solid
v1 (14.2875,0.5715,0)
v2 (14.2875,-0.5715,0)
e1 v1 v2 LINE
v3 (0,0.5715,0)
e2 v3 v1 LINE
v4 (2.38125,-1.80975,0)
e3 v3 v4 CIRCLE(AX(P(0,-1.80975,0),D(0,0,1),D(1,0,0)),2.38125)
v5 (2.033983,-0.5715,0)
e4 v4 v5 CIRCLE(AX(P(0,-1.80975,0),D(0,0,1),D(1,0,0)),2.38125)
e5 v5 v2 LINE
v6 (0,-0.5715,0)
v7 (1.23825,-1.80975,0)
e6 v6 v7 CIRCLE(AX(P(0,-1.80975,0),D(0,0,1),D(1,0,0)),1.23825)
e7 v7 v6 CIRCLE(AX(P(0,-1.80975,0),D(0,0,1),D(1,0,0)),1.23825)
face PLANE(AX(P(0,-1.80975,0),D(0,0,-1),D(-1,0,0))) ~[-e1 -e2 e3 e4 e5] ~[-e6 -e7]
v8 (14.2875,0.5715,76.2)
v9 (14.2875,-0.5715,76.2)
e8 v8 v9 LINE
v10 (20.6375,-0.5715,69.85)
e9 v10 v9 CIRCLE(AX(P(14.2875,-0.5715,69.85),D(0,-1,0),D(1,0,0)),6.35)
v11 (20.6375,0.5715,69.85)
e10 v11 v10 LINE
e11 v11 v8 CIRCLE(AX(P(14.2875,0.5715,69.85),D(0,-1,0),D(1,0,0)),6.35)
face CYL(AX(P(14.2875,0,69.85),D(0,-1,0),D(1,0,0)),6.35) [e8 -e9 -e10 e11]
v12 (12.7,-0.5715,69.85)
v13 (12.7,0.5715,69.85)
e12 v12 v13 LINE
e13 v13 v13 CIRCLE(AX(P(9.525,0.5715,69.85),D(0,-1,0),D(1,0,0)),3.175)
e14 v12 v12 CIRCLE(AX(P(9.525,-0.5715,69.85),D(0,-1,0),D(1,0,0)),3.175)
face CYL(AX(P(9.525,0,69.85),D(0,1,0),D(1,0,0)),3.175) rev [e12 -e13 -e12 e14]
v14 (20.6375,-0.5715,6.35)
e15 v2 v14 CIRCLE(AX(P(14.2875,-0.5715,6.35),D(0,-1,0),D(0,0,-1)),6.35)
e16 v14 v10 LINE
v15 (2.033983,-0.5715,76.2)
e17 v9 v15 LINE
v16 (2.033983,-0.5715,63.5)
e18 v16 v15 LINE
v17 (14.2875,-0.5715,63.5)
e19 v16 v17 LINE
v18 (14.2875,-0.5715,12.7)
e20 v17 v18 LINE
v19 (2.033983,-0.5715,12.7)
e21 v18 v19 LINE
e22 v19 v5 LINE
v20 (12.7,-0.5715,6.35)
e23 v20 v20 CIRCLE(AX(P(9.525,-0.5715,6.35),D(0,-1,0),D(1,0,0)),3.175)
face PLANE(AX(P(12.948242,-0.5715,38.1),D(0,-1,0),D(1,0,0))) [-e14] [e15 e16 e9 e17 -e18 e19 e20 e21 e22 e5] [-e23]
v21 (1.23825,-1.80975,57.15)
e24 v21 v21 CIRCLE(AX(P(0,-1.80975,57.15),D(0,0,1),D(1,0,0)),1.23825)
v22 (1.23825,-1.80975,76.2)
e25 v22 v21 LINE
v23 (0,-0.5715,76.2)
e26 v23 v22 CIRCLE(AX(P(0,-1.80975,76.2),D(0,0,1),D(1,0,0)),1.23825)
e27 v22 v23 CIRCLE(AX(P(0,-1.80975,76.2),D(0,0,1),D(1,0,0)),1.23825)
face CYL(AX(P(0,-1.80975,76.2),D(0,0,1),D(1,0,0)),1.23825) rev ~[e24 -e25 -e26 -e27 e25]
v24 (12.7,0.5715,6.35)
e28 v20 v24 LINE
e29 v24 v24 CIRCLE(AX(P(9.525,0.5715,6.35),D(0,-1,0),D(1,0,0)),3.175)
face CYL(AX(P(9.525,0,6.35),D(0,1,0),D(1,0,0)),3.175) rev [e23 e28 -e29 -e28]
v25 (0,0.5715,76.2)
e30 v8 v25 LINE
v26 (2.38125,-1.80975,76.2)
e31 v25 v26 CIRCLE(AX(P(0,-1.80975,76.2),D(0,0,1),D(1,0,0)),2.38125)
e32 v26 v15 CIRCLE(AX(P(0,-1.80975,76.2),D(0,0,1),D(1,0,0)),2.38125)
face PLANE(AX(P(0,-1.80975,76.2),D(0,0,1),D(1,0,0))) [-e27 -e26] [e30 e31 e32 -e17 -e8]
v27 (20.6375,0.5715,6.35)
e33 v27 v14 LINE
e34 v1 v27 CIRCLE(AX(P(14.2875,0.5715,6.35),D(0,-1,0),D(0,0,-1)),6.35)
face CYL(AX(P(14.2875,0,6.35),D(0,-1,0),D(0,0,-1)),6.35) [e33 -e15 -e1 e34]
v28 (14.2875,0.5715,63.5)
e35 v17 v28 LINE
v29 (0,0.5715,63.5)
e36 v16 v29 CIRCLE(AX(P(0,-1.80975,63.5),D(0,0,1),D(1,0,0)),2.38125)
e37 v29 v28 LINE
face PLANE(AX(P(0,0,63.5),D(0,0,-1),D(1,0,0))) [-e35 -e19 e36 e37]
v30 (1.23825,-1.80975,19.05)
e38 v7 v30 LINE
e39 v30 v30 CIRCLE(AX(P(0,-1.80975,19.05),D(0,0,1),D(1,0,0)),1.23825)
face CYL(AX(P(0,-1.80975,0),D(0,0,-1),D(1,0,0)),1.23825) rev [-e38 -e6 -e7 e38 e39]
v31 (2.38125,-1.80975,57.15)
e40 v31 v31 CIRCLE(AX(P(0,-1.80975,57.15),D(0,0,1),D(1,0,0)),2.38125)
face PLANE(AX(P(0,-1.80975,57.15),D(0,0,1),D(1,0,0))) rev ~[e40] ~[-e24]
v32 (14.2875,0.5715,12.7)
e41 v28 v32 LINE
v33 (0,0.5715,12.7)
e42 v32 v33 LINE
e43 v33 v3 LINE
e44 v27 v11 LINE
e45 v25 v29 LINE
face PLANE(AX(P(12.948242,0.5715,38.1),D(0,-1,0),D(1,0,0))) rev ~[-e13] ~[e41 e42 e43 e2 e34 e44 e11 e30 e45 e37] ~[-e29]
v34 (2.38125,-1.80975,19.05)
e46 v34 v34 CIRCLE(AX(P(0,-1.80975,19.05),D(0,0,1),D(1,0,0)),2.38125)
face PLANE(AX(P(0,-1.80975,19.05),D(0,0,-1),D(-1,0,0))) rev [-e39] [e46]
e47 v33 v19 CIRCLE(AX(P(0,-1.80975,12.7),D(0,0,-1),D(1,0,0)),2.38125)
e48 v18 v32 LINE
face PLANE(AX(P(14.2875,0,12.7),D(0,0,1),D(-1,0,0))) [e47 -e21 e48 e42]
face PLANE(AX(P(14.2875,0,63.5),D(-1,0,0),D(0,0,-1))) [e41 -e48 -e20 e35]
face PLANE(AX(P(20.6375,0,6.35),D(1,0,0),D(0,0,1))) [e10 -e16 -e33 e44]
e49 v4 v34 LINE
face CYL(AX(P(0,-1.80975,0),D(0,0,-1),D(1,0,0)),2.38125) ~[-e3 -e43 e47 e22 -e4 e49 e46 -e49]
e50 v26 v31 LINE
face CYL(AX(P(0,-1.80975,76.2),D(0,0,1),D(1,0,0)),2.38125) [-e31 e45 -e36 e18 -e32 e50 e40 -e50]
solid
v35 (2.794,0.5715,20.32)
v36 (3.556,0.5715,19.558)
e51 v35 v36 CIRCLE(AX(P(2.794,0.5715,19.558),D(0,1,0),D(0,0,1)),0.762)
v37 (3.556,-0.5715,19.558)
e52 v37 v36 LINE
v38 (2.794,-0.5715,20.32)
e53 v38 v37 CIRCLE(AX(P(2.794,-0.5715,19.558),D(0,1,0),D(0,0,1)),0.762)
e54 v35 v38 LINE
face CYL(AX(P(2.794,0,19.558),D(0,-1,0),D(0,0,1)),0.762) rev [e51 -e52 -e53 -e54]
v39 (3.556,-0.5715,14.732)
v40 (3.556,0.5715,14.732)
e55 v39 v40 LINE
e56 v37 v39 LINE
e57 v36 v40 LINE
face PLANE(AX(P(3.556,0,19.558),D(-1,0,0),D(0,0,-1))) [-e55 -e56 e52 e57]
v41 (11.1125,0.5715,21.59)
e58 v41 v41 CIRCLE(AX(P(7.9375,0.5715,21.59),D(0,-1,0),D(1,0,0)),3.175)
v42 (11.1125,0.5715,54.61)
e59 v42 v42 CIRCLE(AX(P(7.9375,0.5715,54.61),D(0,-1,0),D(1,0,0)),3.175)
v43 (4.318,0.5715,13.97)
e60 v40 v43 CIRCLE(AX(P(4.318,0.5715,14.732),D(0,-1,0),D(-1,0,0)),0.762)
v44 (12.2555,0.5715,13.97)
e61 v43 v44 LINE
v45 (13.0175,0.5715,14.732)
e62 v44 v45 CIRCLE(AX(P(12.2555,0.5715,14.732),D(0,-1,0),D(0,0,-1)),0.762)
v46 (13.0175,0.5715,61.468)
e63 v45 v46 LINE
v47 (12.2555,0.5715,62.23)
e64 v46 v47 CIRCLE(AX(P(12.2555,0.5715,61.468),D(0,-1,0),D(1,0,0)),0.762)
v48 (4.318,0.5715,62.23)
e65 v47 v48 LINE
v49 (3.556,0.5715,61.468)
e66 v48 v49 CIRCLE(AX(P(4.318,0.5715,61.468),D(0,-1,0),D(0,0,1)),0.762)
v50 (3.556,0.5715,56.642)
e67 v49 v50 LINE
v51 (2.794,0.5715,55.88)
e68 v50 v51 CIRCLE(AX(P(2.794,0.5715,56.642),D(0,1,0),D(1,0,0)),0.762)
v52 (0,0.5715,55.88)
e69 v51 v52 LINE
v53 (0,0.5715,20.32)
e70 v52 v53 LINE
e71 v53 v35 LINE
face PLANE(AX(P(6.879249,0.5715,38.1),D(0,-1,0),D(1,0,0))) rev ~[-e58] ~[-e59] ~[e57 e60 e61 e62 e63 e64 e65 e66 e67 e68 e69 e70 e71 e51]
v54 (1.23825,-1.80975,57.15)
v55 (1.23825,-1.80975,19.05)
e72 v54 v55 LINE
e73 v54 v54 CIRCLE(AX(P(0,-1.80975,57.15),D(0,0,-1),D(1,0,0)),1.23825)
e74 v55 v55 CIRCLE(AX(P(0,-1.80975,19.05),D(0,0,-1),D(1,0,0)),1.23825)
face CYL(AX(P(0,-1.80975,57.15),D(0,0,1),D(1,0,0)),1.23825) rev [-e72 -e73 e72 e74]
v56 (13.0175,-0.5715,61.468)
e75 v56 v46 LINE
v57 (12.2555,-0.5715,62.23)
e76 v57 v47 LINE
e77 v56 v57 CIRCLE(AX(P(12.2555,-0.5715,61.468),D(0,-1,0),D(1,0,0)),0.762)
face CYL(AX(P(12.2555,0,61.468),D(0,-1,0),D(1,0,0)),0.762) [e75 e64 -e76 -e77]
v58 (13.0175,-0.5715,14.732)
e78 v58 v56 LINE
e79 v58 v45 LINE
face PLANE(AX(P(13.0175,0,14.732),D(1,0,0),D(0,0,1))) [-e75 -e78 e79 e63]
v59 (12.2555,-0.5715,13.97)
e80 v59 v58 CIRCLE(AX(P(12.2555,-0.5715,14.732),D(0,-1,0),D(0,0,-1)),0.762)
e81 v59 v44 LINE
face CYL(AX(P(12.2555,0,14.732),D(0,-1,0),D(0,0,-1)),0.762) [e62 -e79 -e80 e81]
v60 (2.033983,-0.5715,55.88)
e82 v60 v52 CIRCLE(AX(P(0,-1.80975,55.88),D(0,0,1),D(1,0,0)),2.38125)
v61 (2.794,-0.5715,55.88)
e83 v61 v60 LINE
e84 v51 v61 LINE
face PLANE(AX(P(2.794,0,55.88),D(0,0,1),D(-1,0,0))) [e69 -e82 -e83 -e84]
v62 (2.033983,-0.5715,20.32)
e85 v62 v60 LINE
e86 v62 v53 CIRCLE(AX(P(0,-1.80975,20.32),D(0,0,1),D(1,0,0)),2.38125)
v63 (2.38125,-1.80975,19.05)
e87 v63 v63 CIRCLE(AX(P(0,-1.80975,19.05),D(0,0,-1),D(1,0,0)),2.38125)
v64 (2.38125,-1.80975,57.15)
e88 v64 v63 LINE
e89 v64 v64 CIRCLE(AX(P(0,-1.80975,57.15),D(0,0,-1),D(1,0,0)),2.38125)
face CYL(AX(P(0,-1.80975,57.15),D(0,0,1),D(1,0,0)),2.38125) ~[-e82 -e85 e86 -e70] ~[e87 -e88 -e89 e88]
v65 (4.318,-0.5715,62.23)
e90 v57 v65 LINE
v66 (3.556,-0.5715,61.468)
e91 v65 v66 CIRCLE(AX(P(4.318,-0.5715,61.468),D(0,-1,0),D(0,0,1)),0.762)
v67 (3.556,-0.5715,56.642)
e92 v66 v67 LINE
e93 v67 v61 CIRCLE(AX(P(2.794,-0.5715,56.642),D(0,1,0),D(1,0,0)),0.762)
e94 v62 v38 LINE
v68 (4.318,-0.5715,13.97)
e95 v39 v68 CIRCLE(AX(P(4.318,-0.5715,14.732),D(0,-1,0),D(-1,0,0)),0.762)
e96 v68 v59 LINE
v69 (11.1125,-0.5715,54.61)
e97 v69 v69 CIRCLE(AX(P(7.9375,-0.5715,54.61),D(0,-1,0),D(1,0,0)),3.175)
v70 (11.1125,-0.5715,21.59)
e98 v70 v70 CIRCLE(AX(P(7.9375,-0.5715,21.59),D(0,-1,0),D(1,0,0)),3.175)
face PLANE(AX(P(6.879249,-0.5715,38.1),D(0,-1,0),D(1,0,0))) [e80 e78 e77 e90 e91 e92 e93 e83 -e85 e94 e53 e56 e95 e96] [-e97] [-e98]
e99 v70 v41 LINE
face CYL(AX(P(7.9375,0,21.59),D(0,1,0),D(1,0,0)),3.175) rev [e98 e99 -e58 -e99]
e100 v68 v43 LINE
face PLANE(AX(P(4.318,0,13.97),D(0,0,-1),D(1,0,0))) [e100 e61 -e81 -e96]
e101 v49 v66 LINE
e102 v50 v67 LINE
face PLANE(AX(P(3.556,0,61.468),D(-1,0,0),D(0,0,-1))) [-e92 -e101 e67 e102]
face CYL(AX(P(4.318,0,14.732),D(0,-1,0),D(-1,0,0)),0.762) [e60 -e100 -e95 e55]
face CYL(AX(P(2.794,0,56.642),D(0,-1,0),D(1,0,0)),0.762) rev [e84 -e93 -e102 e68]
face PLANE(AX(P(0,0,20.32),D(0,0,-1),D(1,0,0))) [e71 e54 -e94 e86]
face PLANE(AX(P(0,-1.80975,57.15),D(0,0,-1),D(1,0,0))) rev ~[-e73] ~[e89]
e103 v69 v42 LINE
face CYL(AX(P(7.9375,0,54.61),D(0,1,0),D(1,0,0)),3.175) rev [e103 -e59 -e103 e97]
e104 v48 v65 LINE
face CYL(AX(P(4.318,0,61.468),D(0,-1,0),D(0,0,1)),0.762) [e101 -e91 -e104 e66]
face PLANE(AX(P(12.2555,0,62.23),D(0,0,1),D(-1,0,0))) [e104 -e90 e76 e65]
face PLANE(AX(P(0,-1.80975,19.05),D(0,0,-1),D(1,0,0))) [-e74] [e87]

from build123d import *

# Parameters (mm, degrees)
F1_R     = 3.175
F2_DEPTH = 0.5715
F3_R     = 2.38125
F3_R_2   = 1.23825
F4_DEPTH = 19.05
F6_R     = 2.38125
F6_R_2   = 1.23825
F7_DEPTH = 38.1
F8_R     = 3.175
F9_DEPTH = 0.5715


# Not quite as in the source:
# - a pattern or mirror of a feature is missing from the dataset's text; its kind, count and spacing are read off the source's solid


with BuildPart() as f2:
    # F1 (on Front) → F2 (new body, symmetric)
    with BuildSketch(Plane.XZ):
        with BuildLine():
            Line((0, 12.7), (0, 0))
            Line((0, 0), (14.2875, 0))
            ThreePointArc((14.2875, 0), (18.7776280605, 1.8598719395), (20.6375, 6.35))
            Line((20.6375, 6.35), (20.6375, 69.85))
            ThreePointArc((20.6375, 69.85), (18.7776280605, 74.3401280605), (14.2875, 76.2))
            Line((14.2875, 76.2), (0, 76.2))
            Line((0, 76.2), (0, 63.5))
            Line((0, 63.5), (14.2875, 63.5))
            Line((14.2875, 63.5), (14.2875, 12.7))
            Line((14.2875, 12.7), (0, 12.7))
        make_face()
        with Locations((9.525, 6.35)):
            Circle(F1_R, mode=Mode.SUBTRACT)
        with Locations((9.525, 69.85)):
            Circle(F1_R, mode=Mode.SUBTRACT)
    extrude(amount=F2_DEPTH, both=True)

    # F3 (on face) → F4 (join)
    with BuildSketch(Plane.XY.offset(76.2)):
        with Locations((0, -1.80975)):
            Circle(F3_R)
        with Locations((0, -1.80975)):
            Circle(F3_R_2, mode=Mode.SUBTRACT)
    f4 = extrude(amount=-F4_DEPTH)

    # F4_copies: F4 across plane
    add(f4.mirror(Plane(origin=(0, 0, 38.1), x_dir=(-1, 0, 0), z_dir=(0, 0, -1))))


with BuildPart() as f7:
    # F6 (on face) → F7 (new body)
    with BuildSketch(Plane(origin=(0, 0, 57.15), x_dir=(1, 0, 0), z_dir=(0, 0, -1))):
        with Locations((0, 1.80975)):
            Circle(F6_R)
        with Locations((0, 1.80975)):
            Circle(F6_R_2, mode=Mode.SUBTRACT)
    extrude(amount=F7_DEPTH)

    # F8 (on Front) → F9 (join, symmetric)
    with BuildSketch(Plane.XZ):
        with BuildLine():
            Line((12.2555, 62.23), (4.318, 62.23))
            ThreePointArc((4.318, 62.23), (3.7791846327, 62.0068153673), (3.556, 61.468))
            Line((3.556, 61.468), (3.556, 56.642))
            ThreePointArc((3.556, 56.642), (3.3328153673, 56.1031846327), (2.794, 55.88))
            Line((2.794, 55.88), (0, 55.88))
            Line((0, 55.88), (0, 20.32))
            Line((0, 20.32), (2.794, 20.32))
            ThreePointArc((2.794, 20.32), (3.3328153673, 20.0968153673), (3.556, 19.558))
            Line((3.556, 19.558), (3.556, 14.732))
            ThreePointArc((3.556, 14.732), (3.7791846327, 14.1931846327), (4.318, 13.97))
            Line((4.318, 13.97), (12.2555, 13.97))
            ThreePointArc((12.2555, 13.97), (12.7943153673, 14.1931846327), (13.0175, 14.732))
            Line((13.0175, 14.732), (13.0175, 61.468))
            ThreePointArc((13.0175, 61.468), (12.7943153673, 62.0068153673), (12.2555, 62.23))
        make_face()
        with Locations((7.9375, 21.59)):
            Circle(F8_R, mode=Mode.SUBTRACT)
        with Locations((7.9375, 54.61)):
            Circle(F8_R, mode=Mode.SUBTRACT)
    extrude(amount=F9_DEPTH, both=True)


solid = Compound([f2.part, f7.part])
